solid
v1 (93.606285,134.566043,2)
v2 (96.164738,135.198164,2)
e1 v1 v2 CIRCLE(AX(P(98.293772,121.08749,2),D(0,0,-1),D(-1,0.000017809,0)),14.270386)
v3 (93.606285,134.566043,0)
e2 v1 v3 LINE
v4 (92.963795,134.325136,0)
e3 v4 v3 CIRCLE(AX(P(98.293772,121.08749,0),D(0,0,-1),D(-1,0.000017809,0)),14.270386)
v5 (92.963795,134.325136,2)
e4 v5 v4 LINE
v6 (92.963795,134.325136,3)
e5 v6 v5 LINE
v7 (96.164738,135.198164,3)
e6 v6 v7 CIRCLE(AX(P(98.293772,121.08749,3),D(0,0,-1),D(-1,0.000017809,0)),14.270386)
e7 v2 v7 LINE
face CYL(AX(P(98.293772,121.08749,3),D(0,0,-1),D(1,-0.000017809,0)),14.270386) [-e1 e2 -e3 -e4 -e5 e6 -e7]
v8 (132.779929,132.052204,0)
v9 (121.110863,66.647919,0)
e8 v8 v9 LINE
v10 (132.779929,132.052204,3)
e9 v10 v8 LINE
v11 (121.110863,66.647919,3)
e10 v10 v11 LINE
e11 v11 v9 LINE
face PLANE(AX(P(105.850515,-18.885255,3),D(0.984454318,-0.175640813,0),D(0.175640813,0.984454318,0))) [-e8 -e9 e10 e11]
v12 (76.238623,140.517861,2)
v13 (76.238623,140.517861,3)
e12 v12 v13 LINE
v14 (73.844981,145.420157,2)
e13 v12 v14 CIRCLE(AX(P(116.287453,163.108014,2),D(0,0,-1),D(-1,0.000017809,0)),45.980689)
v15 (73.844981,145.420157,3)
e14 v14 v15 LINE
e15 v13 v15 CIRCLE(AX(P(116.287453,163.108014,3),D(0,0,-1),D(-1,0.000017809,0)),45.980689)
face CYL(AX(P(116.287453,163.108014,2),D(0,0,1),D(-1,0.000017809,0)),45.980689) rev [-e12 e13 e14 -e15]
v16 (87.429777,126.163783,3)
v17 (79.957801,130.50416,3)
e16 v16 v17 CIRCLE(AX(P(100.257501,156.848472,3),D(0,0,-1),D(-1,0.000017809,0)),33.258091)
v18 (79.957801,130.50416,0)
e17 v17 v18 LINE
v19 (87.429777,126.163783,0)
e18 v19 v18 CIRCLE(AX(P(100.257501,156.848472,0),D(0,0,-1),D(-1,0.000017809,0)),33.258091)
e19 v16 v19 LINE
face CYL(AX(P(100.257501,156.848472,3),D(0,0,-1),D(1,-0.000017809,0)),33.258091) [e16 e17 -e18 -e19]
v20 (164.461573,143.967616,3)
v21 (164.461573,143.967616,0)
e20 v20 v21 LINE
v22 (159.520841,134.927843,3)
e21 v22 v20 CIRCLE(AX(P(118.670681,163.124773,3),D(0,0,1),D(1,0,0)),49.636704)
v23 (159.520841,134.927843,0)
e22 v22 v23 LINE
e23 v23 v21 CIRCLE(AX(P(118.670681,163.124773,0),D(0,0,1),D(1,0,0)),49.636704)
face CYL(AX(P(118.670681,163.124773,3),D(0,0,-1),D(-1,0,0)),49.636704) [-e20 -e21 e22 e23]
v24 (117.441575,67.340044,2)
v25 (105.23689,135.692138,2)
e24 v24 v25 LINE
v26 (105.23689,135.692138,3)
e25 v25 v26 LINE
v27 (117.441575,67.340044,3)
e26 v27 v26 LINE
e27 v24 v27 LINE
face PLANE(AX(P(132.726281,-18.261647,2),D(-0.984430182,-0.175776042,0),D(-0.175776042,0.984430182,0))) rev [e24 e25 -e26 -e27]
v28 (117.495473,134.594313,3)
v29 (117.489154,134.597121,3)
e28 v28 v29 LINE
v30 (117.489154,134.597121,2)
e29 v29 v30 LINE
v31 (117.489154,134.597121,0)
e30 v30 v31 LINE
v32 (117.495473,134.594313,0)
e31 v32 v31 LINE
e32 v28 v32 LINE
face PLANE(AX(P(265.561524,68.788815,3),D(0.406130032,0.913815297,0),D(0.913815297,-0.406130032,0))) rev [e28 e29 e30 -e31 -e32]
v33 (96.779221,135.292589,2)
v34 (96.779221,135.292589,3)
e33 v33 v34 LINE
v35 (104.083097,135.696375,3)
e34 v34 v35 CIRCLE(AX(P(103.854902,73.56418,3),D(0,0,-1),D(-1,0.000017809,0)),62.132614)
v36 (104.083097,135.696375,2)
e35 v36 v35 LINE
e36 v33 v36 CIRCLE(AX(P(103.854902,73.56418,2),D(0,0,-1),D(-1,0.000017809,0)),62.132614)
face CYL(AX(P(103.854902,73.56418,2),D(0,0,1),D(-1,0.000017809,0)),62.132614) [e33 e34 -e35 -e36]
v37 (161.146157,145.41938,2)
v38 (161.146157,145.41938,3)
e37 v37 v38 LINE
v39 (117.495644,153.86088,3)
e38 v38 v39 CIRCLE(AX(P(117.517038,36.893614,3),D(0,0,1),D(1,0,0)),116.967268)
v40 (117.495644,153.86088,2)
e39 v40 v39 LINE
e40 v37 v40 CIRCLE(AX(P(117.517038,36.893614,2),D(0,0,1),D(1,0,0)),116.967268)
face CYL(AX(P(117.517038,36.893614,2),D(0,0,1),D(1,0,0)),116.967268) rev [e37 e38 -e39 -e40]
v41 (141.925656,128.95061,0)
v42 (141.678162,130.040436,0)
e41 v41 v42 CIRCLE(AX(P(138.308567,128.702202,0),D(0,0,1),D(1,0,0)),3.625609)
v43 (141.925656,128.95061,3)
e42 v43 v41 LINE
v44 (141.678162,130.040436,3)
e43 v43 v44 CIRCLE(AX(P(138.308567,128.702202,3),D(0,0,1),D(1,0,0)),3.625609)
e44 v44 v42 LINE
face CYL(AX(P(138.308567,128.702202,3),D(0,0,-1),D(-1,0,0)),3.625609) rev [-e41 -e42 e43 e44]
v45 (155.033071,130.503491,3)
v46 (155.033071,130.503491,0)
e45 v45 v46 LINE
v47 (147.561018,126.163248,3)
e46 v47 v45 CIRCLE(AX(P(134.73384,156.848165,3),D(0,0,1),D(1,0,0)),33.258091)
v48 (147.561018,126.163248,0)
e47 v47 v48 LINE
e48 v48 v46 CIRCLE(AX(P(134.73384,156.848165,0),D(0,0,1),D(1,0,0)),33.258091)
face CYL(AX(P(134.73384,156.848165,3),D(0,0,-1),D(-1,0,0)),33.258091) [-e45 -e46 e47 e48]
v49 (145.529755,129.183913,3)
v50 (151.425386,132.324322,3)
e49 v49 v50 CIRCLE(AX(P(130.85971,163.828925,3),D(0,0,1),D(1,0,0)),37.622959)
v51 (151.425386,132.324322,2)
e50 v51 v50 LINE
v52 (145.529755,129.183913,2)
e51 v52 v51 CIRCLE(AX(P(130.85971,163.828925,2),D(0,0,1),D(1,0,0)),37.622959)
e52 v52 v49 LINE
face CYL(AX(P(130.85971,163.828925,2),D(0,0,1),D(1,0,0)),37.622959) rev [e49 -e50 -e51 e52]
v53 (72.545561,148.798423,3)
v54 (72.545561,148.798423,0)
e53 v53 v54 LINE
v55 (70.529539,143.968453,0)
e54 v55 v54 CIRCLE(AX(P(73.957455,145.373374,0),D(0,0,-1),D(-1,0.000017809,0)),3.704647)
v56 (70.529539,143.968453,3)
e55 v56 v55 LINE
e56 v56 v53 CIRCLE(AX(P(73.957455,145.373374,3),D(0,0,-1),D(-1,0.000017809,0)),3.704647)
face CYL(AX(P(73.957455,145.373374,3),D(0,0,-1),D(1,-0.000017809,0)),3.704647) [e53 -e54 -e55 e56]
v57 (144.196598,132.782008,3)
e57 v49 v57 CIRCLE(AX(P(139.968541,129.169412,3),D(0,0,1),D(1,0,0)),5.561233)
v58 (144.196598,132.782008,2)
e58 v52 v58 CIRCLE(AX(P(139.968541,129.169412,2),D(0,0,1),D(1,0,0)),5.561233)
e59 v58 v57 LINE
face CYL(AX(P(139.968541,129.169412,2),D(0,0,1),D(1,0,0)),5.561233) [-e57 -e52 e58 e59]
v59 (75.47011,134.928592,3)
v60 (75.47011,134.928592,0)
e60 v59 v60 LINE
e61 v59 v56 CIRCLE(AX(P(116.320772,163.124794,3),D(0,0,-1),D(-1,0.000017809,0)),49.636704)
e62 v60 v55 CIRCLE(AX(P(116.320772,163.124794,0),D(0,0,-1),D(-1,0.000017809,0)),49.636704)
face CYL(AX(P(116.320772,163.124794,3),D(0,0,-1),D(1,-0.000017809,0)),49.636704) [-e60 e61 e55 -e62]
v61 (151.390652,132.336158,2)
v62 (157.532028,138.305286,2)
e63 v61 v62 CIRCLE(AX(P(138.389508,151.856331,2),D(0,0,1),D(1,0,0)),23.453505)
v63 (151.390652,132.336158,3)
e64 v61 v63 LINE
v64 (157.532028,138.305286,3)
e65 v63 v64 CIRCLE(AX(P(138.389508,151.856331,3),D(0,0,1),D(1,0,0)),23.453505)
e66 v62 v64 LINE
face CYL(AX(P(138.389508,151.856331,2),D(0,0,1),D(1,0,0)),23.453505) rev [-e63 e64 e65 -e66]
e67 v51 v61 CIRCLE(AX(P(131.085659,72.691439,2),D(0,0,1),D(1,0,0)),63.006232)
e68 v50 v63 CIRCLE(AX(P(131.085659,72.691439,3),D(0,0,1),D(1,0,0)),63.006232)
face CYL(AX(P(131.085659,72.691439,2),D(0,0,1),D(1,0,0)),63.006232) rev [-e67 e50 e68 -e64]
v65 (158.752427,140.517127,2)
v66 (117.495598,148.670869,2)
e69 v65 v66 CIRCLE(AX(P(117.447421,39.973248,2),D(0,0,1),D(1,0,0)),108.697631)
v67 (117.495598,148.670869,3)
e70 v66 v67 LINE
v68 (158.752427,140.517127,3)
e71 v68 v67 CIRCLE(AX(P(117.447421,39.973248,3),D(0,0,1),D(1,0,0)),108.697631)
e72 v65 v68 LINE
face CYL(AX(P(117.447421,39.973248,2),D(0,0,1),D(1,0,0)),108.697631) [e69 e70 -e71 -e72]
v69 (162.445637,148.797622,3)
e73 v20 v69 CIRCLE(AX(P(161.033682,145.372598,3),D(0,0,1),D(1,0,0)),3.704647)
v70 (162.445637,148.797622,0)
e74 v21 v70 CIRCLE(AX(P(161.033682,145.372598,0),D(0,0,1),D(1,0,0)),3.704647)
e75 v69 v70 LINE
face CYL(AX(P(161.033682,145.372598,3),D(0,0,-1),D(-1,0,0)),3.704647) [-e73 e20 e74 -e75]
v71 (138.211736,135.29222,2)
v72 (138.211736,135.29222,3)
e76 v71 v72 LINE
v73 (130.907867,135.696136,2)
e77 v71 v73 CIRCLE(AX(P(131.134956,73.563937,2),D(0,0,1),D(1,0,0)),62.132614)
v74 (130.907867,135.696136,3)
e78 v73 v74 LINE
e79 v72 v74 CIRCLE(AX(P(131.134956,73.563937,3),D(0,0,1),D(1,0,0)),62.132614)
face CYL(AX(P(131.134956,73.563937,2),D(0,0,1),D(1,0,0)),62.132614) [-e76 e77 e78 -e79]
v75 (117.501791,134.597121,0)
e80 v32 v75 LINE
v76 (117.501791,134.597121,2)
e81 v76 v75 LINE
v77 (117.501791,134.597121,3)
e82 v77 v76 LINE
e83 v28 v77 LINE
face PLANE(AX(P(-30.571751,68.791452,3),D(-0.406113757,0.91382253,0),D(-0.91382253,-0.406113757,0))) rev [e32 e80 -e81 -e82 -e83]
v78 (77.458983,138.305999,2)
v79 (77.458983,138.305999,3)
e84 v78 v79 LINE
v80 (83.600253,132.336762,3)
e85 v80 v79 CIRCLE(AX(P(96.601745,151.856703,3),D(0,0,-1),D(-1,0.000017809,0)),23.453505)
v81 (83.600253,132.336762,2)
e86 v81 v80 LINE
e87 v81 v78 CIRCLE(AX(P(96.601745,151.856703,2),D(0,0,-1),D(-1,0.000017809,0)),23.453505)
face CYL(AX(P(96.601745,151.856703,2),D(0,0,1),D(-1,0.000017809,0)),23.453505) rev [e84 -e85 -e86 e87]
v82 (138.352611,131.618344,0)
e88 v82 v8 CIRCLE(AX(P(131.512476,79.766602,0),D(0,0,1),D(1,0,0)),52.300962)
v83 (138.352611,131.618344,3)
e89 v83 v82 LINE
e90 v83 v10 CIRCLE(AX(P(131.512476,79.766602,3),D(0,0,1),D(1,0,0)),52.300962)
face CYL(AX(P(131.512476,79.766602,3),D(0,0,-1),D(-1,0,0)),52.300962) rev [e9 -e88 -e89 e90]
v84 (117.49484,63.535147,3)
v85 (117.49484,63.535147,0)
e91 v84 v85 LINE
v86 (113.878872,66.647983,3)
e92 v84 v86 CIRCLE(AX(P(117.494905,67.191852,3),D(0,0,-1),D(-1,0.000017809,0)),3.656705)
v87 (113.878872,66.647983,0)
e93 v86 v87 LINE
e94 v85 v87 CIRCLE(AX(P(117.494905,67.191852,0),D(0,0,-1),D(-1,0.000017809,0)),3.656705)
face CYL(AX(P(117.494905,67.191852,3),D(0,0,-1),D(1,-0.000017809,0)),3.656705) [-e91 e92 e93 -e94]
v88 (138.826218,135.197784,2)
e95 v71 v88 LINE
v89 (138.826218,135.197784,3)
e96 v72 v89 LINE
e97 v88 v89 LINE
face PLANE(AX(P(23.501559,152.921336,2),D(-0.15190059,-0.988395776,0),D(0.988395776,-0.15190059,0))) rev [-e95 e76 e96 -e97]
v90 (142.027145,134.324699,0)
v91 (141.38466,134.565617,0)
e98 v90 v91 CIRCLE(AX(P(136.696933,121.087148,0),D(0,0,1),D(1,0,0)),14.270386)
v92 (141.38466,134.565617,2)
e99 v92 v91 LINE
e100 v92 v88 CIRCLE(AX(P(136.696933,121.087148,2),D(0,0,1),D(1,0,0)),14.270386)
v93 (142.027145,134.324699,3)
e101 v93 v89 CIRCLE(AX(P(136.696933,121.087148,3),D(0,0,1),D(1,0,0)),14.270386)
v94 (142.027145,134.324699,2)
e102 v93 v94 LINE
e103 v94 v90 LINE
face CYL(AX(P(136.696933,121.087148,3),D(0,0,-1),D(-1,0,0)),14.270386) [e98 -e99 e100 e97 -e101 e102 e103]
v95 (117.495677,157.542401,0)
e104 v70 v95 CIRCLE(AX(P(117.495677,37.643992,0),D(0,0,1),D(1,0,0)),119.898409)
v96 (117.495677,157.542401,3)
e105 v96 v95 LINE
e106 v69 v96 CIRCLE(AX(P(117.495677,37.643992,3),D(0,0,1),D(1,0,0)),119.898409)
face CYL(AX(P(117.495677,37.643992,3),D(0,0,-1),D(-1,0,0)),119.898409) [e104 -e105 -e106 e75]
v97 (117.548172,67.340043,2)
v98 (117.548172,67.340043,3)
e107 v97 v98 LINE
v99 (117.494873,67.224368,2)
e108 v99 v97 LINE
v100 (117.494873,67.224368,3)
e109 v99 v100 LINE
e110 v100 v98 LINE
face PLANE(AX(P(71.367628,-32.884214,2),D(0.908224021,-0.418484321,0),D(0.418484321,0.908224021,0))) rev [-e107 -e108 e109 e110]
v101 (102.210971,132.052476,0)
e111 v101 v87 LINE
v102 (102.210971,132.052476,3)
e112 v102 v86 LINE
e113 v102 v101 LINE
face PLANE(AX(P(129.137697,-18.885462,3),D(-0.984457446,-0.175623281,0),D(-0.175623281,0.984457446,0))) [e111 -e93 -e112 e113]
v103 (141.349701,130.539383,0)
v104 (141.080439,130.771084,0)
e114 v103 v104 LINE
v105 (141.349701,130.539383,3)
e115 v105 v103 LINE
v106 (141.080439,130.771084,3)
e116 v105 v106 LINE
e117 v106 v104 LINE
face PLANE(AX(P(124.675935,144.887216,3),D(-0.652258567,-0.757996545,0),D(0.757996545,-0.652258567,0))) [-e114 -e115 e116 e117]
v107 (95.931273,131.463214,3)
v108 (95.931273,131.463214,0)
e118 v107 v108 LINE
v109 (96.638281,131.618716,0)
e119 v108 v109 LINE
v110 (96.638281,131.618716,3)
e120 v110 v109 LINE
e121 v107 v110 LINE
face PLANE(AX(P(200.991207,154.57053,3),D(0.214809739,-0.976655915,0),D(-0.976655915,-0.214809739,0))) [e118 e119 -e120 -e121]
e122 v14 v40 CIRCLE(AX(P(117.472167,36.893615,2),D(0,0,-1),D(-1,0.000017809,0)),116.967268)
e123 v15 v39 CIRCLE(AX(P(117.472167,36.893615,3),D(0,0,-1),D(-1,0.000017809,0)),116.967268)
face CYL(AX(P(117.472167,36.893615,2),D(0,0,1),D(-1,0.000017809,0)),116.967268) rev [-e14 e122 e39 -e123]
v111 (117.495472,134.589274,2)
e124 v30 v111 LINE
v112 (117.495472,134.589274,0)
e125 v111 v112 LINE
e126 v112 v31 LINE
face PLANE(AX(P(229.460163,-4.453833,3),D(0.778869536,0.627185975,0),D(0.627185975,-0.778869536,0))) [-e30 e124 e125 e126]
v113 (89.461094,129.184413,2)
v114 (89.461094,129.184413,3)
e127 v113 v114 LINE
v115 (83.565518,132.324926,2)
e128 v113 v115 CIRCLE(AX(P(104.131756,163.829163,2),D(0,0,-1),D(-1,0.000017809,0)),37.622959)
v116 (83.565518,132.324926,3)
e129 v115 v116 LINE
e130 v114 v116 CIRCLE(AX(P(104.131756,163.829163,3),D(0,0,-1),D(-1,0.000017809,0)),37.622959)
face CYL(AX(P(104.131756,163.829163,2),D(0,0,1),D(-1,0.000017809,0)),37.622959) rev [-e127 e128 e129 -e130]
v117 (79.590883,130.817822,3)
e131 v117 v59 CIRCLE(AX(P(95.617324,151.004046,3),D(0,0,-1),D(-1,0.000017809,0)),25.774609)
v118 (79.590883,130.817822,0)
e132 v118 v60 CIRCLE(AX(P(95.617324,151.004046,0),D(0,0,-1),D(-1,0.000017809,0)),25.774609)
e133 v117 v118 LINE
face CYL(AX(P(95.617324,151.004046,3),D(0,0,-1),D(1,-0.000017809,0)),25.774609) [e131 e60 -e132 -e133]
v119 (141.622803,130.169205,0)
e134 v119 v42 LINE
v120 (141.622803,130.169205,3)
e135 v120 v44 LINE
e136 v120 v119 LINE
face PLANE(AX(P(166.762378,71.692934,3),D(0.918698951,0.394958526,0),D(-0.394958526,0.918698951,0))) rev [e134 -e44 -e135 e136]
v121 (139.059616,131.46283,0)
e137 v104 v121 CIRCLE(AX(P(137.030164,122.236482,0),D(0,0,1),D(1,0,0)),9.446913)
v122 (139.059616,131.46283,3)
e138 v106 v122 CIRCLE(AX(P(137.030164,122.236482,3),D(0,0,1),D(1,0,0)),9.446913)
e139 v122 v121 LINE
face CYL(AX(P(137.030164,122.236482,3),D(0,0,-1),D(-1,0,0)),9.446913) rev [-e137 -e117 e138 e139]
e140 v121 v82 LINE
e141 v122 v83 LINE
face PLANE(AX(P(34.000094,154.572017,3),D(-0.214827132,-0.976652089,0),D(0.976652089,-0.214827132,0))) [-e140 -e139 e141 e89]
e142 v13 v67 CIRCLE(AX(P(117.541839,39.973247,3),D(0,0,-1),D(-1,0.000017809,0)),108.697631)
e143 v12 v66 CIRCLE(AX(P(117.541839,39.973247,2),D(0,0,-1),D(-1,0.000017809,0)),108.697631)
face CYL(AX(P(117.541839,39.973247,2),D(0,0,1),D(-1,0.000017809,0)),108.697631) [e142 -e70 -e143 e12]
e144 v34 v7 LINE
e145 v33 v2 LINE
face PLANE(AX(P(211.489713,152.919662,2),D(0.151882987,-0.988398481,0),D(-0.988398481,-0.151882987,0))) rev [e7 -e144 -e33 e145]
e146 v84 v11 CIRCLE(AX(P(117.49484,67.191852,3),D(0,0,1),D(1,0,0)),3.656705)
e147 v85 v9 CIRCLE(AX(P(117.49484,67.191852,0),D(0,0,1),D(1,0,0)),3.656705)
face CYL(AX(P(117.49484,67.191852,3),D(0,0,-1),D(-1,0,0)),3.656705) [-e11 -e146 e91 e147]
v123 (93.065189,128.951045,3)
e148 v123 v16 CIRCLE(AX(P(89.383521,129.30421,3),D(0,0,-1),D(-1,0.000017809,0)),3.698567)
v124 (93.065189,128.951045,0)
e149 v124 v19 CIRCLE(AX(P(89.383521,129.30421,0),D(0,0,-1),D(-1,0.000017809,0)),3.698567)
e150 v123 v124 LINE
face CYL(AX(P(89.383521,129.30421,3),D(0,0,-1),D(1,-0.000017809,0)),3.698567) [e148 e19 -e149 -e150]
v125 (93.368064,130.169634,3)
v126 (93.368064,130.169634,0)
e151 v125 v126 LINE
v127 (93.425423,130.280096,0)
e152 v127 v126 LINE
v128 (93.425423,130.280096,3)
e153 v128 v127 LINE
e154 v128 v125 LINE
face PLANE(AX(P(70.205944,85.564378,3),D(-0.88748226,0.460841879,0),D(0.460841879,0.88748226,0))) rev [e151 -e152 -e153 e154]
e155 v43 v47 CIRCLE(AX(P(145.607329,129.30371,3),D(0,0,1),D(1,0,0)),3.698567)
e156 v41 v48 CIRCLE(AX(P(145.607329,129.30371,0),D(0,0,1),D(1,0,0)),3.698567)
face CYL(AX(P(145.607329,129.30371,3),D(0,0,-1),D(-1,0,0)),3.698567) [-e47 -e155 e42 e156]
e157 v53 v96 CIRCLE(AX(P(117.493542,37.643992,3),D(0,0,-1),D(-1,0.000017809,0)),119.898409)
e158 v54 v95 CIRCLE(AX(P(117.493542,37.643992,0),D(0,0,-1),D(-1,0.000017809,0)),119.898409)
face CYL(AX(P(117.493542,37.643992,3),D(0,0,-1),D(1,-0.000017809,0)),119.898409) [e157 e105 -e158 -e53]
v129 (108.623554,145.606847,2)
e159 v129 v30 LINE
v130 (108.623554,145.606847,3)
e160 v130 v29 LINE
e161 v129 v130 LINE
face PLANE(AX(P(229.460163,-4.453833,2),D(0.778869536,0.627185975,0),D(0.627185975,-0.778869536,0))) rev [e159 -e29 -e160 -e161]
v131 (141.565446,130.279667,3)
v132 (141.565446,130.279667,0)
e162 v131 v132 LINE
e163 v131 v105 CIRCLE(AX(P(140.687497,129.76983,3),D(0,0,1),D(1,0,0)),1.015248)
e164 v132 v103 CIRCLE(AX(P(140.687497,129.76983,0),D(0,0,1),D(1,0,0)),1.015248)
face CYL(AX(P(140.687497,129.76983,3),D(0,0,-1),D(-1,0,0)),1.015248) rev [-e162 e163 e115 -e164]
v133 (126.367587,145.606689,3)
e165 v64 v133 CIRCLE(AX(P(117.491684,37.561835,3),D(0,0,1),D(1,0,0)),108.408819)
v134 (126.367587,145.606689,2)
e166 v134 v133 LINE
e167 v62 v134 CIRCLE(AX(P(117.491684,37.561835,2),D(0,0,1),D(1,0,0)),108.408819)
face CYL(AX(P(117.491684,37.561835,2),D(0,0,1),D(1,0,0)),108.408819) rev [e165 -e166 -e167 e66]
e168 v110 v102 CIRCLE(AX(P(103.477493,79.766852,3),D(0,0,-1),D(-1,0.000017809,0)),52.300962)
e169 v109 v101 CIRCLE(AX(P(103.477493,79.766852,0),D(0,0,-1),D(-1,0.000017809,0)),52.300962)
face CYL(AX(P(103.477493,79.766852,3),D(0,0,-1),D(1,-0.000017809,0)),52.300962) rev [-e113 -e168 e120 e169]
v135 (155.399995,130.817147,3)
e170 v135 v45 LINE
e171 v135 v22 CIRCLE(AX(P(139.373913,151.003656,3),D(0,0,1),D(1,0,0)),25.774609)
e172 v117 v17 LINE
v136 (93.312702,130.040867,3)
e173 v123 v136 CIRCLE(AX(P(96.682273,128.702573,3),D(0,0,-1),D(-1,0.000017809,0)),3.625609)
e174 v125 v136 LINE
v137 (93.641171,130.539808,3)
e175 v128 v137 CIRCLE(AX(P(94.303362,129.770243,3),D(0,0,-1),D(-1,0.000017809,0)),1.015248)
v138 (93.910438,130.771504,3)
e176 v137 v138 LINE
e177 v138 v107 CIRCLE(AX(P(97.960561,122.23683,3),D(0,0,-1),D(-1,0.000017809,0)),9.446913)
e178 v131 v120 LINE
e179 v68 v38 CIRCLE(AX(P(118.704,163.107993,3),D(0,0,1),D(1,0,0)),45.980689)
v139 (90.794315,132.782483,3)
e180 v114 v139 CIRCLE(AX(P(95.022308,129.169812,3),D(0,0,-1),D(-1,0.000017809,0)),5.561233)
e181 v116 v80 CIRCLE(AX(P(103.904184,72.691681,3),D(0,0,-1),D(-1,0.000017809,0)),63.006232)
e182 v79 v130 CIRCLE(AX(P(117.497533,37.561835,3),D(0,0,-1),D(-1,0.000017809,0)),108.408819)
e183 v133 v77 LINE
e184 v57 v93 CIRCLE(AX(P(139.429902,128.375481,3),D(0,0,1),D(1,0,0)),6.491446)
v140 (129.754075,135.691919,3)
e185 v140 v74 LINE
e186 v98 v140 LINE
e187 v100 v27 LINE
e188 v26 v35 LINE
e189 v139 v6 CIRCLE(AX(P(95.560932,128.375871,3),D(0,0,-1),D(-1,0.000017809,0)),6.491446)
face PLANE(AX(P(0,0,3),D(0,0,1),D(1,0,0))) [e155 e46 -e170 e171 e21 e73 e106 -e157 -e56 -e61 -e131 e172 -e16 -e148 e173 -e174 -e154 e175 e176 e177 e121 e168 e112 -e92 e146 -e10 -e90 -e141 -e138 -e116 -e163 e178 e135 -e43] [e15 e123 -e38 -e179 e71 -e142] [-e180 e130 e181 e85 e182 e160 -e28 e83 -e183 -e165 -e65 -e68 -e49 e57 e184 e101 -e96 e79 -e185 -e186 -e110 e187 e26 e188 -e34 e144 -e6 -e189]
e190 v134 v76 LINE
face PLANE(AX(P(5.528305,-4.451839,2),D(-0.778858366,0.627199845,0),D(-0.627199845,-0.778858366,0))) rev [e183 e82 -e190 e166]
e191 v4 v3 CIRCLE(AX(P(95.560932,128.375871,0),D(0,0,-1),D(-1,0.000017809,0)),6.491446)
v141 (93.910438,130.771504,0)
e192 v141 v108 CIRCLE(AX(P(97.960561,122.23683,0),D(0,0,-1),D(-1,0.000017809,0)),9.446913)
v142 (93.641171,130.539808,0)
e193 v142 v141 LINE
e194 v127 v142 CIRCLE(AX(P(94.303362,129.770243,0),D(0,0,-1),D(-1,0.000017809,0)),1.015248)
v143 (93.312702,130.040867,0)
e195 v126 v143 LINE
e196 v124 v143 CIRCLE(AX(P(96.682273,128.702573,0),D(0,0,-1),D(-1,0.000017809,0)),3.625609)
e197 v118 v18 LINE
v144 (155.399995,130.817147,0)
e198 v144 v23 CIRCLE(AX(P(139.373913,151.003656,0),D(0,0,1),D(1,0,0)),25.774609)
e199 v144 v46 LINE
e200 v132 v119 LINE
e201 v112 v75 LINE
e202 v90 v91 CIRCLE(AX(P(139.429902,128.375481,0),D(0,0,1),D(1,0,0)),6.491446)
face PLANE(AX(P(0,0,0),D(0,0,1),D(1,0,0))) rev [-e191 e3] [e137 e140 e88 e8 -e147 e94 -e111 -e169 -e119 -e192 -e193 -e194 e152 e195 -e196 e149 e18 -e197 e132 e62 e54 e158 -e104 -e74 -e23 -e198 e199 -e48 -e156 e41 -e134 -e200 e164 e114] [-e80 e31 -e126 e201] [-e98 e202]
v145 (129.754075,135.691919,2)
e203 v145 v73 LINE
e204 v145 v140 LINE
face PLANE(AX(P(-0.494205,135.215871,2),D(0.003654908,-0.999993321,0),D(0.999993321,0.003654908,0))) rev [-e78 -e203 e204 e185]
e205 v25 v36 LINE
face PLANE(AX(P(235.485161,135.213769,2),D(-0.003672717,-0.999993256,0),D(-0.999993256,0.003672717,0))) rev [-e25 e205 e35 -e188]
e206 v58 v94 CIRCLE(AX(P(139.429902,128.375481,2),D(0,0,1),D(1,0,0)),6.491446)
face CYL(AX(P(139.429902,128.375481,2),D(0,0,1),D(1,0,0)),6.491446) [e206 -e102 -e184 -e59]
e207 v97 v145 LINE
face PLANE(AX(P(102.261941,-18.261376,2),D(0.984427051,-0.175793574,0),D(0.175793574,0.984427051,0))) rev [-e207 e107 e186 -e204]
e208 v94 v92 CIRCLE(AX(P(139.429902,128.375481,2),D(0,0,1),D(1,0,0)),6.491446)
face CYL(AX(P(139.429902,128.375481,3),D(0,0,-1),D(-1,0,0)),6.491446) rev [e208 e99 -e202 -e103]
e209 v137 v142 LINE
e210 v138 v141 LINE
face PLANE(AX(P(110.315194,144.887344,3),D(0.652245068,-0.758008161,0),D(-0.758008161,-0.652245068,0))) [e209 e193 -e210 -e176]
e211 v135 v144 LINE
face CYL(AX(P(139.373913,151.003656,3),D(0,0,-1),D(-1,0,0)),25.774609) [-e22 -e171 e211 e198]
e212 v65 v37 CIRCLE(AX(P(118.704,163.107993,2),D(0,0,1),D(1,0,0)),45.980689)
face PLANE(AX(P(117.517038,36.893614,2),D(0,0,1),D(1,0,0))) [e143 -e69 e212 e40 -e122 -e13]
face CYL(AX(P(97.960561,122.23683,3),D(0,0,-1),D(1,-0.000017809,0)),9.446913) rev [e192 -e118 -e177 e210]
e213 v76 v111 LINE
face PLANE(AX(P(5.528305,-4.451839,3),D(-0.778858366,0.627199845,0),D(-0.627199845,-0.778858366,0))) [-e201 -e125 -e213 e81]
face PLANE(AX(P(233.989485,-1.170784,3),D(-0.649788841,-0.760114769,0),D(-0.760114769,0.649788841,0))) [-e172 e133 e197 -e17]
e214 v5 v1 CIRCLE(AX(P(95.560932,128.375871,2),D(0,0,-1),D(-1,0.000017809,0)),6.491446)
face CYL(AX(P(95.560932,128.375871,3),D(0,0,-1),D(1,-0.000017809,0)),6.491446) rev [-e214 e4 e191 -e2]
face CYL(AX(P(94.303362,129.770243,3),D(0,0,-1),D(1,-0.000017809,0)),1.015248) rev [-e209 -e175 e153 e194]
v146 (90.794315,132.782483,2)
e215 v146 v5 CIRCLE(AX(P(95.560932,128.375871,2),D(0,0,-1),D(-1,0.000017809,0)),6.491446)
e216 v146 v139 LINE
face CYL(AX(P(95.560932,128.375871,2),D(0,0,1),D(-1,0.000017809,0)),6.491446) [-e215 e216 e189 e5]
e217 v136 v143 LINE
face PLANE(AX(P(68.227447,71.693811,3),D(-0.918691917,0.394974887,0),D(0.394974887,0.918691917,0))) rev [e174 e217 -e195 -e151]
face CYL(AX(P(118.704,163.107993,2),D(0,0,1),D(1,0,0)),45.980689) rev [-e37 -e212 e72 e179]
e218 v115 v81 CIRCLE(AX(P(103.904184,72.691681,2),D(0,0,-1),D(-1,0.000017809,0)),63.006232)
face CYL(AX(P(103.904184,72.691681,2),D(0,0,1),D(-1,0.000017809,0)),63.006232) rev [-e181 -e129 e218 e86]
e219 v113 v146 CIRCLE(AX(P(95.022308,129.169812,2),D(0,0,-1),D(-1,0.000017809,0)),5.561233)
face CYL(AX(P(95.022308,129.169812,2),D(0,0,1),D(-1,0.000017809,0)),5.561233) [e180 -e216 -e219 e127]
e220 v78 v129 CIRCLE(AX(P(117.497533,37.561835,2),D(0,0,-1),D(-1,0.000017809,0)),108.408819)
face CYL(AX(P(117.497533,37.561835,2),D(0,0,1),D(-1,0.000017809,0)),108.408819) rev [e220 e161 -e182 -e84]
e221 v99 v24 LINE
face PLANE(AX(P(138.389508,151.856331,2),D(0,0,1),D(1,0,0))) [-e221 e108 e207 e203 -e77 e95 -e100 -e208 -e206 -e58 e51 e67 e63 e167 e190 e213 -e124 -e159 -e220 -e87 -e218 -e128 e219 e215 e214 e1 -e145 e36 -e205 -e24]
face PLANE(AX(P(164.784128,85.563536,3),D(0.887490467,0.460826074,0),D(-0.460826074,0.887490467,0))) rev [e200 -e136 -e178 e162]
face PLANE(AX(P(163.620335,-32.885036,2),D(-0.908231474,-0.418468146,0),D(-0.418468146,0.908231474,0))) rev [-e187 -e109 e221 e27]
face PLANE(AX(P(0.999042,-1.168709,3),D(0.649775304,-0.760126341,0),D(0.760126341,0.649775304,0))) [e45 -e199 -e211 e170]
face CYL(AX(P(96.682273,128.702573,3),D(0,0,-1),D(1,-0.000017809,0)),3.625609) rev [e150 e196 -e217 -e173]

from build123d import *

# Parameters (mm, degrees)
EXTRUDE_1_DEPTH     = 3
CUT_EXTRUDE_START   = 2
CUT_EXTRUDE_2_DEPTH = 1


# Read off the part's stored shape, not the designer's step: 凸台-拉伸1
with BuildPart() as part:
    # 凸台-拉伸1 outline → 凸台-拉伸1 (new body)
    with BuildSketch(Plane.XY):
        with BuildLine():
            ThreePointArc((162.445637333, 148.797622459), (140.392019923, 155.335903316), (117.495676879, 157.542401146))
            Line((117.495676879, 157.542401146), (117.495472536, 134.594312545))
            Line((117.495472536, 134.594312545), (117.501791432, 134.597120738))
            Line((117.501791432, 134.597120738), (117.495472491, 134.589273862))
            Line((117.495472491, 134.589273862), (117.494839782, 63.535147265))
            ThreePointArc((117.494839782, 63.535147265), (119.8804724, 64.42052621), (121.110863339, 66.647918633))
            Line((121.110863339, 66.647918633), (132.779928848, 132.052204294))
            ThreePointArc((132.779928848, 132.052204294), (135.572070277, 131.909773522), (138.352611472, 131.618344369))
            Line((138.352611472, 131.618344369), (139.05961627, 131.462829611))
            ThreePointArc((139.05961627, 131.462829611), (140.089641052, 131.174253974), (141.080439341, 130.771084408))
            Line((141.080439341, 130.771084408), (141.349701494, 130.539383423))
            ThreePointArc((141.349701494, 130.539383423), (141.468445777, 130.418556757), (141.565445548, 130.279667116))
            Line((141.565445548, 130.279667116), (141.622802734, 130.169204712))
            Line((141.622802734, 130.169204712), (141.678161833, 130.040435885))
            ThreePointArc((141.678161833, 130.040435885), (141.844152912, 129.505116408), (141.925655993, 128.950610116))
            ThreePointArc((141.925655993, 128.950610116), (143.967564284, 125.988506969), (147.561018067, 126.163248026))
            ThreePointArc((147.561018067, 126.163248026), (151.438605128, 128.089662738), (155.033071354, 130.503491151))
            Line((155.033071354, 130.503491151), (155.399994914, 130.81714673))
            ThreePointArc((155.399994914, 130.81714673), (157.576828206, 132.755797519), (159.520841192, 134.927843461))
            ThreePointArc((159.520841192, 134.927843461), (162.226362027, 139.319204759), (164.46157289, 143.967616254))
            ThreePointArc((164.46157289, 143.967616254), (164.452492947, 146.79953259), (162.445637333, 148.797622459))
        make_face()
        with BuildLine():
            ThreePointArc((142.027144862, 134.324698861), (141.707350512, 134.449020168), (141.384659698, 134.56561713))
            ThreePointArc((141.384659698, 134.56561713), (141.70908775, 134.453653063), (142.027144862, 134.324698861))
        make_face(mode=Mode.SUBTRACT)
    extrude(amount=EXTRUDE_1_DEPTH)

    # 草图4<3> → 切除-拉伸2 (cut)
    with BuildSketch(Plane.XY.offset(CUT_EXTRUDE_START)):
        with BuildLine():
            Line((129.754075071, 135.691919441), (130.907867432, 135.696136475))
            ThreePointArc((130.907867432, 135.696136475), (134.565751216, 135.60175956), (138.211736169, 135.292220379))
            Line((138.211736169, 135.292220379), (138.826217651, 135.197784424))
            ThreePointArc((138.826217651, 135.197784424), (140.120063117, 134.940887305), (141.384659698, 134.56561713))
            ThreePointArc((141.384659698, 134.56561713), (142.906940981, 133.857183707), (144.196597811, 132.782007684))
            ThreePointArc((144.196597811, 132.782007684), (145.183330218, 131.10158314), (145.529755049, 129.183913374))
            ThreePointArc((145.529755049, 129.183913374), (148.547404982, 130.623014397), (151.425386163, 132.324321891))
            ThreePointArc((151.425386163, 132.324321891), (151.40801976, 132.330242443), (151.390651634, 132.336157937))
            ThreePointArc((151.390651634, 132.336157937), (154.736109947, 135.038022712), (157.532027719, 138.305285848))
            ThreePointArc((157.532027719, 138.305285848), (142.220764521, 143.112508129), (126.367587205, 145.606688512))
            Line((126.367587205, 145.606688512), (117.501791432, 134.597120738))
            Line((117.501791432, 134.597120738), (117.495472491, 134.589273862))
            Line((117.495472491, 134.589273862), (117.494872633, 67.224367653))
            Line((117.494872633, 67.224367653), (117.548172453, 67.340042661))
            Line((117.548172453, 67.340042661), (129.754075071, 135.691919441))
        make_face()
        with BuildLine():
            Line((117.495644097, 153.860880328), (117.495597882, 148.670868738))
            ThreePointArc((117.495597882, 148.670868738), (138.52210518, 146.608292632), (158.752427095, 140.517126524))
            ThreePointArc((158.752427095, 140.517126524), (160.02206081, 142.932720764), (161.14615728, 145.419379652))
            ThreePointArc((161.14615728, 145.419379652), (139.725666091, 151.733148545), (117.495644097, 153.860880328))
        make_face()
    extrude(amount=CUT_EXTRUDE_2_DEPTH, mode=Mode.SUBTRACT)

    # 镜向2: part across plane


with BuildPart() as part_1:
    add(part.part)
    add(part.part.mirror(Plane(origin=(117.494274017, -0.00104624, 3), x_dir=(0, 0, 1), z_dir=(0.999999999960354, -8.904603525034718e-06, 0))))


solid = part_1.part
